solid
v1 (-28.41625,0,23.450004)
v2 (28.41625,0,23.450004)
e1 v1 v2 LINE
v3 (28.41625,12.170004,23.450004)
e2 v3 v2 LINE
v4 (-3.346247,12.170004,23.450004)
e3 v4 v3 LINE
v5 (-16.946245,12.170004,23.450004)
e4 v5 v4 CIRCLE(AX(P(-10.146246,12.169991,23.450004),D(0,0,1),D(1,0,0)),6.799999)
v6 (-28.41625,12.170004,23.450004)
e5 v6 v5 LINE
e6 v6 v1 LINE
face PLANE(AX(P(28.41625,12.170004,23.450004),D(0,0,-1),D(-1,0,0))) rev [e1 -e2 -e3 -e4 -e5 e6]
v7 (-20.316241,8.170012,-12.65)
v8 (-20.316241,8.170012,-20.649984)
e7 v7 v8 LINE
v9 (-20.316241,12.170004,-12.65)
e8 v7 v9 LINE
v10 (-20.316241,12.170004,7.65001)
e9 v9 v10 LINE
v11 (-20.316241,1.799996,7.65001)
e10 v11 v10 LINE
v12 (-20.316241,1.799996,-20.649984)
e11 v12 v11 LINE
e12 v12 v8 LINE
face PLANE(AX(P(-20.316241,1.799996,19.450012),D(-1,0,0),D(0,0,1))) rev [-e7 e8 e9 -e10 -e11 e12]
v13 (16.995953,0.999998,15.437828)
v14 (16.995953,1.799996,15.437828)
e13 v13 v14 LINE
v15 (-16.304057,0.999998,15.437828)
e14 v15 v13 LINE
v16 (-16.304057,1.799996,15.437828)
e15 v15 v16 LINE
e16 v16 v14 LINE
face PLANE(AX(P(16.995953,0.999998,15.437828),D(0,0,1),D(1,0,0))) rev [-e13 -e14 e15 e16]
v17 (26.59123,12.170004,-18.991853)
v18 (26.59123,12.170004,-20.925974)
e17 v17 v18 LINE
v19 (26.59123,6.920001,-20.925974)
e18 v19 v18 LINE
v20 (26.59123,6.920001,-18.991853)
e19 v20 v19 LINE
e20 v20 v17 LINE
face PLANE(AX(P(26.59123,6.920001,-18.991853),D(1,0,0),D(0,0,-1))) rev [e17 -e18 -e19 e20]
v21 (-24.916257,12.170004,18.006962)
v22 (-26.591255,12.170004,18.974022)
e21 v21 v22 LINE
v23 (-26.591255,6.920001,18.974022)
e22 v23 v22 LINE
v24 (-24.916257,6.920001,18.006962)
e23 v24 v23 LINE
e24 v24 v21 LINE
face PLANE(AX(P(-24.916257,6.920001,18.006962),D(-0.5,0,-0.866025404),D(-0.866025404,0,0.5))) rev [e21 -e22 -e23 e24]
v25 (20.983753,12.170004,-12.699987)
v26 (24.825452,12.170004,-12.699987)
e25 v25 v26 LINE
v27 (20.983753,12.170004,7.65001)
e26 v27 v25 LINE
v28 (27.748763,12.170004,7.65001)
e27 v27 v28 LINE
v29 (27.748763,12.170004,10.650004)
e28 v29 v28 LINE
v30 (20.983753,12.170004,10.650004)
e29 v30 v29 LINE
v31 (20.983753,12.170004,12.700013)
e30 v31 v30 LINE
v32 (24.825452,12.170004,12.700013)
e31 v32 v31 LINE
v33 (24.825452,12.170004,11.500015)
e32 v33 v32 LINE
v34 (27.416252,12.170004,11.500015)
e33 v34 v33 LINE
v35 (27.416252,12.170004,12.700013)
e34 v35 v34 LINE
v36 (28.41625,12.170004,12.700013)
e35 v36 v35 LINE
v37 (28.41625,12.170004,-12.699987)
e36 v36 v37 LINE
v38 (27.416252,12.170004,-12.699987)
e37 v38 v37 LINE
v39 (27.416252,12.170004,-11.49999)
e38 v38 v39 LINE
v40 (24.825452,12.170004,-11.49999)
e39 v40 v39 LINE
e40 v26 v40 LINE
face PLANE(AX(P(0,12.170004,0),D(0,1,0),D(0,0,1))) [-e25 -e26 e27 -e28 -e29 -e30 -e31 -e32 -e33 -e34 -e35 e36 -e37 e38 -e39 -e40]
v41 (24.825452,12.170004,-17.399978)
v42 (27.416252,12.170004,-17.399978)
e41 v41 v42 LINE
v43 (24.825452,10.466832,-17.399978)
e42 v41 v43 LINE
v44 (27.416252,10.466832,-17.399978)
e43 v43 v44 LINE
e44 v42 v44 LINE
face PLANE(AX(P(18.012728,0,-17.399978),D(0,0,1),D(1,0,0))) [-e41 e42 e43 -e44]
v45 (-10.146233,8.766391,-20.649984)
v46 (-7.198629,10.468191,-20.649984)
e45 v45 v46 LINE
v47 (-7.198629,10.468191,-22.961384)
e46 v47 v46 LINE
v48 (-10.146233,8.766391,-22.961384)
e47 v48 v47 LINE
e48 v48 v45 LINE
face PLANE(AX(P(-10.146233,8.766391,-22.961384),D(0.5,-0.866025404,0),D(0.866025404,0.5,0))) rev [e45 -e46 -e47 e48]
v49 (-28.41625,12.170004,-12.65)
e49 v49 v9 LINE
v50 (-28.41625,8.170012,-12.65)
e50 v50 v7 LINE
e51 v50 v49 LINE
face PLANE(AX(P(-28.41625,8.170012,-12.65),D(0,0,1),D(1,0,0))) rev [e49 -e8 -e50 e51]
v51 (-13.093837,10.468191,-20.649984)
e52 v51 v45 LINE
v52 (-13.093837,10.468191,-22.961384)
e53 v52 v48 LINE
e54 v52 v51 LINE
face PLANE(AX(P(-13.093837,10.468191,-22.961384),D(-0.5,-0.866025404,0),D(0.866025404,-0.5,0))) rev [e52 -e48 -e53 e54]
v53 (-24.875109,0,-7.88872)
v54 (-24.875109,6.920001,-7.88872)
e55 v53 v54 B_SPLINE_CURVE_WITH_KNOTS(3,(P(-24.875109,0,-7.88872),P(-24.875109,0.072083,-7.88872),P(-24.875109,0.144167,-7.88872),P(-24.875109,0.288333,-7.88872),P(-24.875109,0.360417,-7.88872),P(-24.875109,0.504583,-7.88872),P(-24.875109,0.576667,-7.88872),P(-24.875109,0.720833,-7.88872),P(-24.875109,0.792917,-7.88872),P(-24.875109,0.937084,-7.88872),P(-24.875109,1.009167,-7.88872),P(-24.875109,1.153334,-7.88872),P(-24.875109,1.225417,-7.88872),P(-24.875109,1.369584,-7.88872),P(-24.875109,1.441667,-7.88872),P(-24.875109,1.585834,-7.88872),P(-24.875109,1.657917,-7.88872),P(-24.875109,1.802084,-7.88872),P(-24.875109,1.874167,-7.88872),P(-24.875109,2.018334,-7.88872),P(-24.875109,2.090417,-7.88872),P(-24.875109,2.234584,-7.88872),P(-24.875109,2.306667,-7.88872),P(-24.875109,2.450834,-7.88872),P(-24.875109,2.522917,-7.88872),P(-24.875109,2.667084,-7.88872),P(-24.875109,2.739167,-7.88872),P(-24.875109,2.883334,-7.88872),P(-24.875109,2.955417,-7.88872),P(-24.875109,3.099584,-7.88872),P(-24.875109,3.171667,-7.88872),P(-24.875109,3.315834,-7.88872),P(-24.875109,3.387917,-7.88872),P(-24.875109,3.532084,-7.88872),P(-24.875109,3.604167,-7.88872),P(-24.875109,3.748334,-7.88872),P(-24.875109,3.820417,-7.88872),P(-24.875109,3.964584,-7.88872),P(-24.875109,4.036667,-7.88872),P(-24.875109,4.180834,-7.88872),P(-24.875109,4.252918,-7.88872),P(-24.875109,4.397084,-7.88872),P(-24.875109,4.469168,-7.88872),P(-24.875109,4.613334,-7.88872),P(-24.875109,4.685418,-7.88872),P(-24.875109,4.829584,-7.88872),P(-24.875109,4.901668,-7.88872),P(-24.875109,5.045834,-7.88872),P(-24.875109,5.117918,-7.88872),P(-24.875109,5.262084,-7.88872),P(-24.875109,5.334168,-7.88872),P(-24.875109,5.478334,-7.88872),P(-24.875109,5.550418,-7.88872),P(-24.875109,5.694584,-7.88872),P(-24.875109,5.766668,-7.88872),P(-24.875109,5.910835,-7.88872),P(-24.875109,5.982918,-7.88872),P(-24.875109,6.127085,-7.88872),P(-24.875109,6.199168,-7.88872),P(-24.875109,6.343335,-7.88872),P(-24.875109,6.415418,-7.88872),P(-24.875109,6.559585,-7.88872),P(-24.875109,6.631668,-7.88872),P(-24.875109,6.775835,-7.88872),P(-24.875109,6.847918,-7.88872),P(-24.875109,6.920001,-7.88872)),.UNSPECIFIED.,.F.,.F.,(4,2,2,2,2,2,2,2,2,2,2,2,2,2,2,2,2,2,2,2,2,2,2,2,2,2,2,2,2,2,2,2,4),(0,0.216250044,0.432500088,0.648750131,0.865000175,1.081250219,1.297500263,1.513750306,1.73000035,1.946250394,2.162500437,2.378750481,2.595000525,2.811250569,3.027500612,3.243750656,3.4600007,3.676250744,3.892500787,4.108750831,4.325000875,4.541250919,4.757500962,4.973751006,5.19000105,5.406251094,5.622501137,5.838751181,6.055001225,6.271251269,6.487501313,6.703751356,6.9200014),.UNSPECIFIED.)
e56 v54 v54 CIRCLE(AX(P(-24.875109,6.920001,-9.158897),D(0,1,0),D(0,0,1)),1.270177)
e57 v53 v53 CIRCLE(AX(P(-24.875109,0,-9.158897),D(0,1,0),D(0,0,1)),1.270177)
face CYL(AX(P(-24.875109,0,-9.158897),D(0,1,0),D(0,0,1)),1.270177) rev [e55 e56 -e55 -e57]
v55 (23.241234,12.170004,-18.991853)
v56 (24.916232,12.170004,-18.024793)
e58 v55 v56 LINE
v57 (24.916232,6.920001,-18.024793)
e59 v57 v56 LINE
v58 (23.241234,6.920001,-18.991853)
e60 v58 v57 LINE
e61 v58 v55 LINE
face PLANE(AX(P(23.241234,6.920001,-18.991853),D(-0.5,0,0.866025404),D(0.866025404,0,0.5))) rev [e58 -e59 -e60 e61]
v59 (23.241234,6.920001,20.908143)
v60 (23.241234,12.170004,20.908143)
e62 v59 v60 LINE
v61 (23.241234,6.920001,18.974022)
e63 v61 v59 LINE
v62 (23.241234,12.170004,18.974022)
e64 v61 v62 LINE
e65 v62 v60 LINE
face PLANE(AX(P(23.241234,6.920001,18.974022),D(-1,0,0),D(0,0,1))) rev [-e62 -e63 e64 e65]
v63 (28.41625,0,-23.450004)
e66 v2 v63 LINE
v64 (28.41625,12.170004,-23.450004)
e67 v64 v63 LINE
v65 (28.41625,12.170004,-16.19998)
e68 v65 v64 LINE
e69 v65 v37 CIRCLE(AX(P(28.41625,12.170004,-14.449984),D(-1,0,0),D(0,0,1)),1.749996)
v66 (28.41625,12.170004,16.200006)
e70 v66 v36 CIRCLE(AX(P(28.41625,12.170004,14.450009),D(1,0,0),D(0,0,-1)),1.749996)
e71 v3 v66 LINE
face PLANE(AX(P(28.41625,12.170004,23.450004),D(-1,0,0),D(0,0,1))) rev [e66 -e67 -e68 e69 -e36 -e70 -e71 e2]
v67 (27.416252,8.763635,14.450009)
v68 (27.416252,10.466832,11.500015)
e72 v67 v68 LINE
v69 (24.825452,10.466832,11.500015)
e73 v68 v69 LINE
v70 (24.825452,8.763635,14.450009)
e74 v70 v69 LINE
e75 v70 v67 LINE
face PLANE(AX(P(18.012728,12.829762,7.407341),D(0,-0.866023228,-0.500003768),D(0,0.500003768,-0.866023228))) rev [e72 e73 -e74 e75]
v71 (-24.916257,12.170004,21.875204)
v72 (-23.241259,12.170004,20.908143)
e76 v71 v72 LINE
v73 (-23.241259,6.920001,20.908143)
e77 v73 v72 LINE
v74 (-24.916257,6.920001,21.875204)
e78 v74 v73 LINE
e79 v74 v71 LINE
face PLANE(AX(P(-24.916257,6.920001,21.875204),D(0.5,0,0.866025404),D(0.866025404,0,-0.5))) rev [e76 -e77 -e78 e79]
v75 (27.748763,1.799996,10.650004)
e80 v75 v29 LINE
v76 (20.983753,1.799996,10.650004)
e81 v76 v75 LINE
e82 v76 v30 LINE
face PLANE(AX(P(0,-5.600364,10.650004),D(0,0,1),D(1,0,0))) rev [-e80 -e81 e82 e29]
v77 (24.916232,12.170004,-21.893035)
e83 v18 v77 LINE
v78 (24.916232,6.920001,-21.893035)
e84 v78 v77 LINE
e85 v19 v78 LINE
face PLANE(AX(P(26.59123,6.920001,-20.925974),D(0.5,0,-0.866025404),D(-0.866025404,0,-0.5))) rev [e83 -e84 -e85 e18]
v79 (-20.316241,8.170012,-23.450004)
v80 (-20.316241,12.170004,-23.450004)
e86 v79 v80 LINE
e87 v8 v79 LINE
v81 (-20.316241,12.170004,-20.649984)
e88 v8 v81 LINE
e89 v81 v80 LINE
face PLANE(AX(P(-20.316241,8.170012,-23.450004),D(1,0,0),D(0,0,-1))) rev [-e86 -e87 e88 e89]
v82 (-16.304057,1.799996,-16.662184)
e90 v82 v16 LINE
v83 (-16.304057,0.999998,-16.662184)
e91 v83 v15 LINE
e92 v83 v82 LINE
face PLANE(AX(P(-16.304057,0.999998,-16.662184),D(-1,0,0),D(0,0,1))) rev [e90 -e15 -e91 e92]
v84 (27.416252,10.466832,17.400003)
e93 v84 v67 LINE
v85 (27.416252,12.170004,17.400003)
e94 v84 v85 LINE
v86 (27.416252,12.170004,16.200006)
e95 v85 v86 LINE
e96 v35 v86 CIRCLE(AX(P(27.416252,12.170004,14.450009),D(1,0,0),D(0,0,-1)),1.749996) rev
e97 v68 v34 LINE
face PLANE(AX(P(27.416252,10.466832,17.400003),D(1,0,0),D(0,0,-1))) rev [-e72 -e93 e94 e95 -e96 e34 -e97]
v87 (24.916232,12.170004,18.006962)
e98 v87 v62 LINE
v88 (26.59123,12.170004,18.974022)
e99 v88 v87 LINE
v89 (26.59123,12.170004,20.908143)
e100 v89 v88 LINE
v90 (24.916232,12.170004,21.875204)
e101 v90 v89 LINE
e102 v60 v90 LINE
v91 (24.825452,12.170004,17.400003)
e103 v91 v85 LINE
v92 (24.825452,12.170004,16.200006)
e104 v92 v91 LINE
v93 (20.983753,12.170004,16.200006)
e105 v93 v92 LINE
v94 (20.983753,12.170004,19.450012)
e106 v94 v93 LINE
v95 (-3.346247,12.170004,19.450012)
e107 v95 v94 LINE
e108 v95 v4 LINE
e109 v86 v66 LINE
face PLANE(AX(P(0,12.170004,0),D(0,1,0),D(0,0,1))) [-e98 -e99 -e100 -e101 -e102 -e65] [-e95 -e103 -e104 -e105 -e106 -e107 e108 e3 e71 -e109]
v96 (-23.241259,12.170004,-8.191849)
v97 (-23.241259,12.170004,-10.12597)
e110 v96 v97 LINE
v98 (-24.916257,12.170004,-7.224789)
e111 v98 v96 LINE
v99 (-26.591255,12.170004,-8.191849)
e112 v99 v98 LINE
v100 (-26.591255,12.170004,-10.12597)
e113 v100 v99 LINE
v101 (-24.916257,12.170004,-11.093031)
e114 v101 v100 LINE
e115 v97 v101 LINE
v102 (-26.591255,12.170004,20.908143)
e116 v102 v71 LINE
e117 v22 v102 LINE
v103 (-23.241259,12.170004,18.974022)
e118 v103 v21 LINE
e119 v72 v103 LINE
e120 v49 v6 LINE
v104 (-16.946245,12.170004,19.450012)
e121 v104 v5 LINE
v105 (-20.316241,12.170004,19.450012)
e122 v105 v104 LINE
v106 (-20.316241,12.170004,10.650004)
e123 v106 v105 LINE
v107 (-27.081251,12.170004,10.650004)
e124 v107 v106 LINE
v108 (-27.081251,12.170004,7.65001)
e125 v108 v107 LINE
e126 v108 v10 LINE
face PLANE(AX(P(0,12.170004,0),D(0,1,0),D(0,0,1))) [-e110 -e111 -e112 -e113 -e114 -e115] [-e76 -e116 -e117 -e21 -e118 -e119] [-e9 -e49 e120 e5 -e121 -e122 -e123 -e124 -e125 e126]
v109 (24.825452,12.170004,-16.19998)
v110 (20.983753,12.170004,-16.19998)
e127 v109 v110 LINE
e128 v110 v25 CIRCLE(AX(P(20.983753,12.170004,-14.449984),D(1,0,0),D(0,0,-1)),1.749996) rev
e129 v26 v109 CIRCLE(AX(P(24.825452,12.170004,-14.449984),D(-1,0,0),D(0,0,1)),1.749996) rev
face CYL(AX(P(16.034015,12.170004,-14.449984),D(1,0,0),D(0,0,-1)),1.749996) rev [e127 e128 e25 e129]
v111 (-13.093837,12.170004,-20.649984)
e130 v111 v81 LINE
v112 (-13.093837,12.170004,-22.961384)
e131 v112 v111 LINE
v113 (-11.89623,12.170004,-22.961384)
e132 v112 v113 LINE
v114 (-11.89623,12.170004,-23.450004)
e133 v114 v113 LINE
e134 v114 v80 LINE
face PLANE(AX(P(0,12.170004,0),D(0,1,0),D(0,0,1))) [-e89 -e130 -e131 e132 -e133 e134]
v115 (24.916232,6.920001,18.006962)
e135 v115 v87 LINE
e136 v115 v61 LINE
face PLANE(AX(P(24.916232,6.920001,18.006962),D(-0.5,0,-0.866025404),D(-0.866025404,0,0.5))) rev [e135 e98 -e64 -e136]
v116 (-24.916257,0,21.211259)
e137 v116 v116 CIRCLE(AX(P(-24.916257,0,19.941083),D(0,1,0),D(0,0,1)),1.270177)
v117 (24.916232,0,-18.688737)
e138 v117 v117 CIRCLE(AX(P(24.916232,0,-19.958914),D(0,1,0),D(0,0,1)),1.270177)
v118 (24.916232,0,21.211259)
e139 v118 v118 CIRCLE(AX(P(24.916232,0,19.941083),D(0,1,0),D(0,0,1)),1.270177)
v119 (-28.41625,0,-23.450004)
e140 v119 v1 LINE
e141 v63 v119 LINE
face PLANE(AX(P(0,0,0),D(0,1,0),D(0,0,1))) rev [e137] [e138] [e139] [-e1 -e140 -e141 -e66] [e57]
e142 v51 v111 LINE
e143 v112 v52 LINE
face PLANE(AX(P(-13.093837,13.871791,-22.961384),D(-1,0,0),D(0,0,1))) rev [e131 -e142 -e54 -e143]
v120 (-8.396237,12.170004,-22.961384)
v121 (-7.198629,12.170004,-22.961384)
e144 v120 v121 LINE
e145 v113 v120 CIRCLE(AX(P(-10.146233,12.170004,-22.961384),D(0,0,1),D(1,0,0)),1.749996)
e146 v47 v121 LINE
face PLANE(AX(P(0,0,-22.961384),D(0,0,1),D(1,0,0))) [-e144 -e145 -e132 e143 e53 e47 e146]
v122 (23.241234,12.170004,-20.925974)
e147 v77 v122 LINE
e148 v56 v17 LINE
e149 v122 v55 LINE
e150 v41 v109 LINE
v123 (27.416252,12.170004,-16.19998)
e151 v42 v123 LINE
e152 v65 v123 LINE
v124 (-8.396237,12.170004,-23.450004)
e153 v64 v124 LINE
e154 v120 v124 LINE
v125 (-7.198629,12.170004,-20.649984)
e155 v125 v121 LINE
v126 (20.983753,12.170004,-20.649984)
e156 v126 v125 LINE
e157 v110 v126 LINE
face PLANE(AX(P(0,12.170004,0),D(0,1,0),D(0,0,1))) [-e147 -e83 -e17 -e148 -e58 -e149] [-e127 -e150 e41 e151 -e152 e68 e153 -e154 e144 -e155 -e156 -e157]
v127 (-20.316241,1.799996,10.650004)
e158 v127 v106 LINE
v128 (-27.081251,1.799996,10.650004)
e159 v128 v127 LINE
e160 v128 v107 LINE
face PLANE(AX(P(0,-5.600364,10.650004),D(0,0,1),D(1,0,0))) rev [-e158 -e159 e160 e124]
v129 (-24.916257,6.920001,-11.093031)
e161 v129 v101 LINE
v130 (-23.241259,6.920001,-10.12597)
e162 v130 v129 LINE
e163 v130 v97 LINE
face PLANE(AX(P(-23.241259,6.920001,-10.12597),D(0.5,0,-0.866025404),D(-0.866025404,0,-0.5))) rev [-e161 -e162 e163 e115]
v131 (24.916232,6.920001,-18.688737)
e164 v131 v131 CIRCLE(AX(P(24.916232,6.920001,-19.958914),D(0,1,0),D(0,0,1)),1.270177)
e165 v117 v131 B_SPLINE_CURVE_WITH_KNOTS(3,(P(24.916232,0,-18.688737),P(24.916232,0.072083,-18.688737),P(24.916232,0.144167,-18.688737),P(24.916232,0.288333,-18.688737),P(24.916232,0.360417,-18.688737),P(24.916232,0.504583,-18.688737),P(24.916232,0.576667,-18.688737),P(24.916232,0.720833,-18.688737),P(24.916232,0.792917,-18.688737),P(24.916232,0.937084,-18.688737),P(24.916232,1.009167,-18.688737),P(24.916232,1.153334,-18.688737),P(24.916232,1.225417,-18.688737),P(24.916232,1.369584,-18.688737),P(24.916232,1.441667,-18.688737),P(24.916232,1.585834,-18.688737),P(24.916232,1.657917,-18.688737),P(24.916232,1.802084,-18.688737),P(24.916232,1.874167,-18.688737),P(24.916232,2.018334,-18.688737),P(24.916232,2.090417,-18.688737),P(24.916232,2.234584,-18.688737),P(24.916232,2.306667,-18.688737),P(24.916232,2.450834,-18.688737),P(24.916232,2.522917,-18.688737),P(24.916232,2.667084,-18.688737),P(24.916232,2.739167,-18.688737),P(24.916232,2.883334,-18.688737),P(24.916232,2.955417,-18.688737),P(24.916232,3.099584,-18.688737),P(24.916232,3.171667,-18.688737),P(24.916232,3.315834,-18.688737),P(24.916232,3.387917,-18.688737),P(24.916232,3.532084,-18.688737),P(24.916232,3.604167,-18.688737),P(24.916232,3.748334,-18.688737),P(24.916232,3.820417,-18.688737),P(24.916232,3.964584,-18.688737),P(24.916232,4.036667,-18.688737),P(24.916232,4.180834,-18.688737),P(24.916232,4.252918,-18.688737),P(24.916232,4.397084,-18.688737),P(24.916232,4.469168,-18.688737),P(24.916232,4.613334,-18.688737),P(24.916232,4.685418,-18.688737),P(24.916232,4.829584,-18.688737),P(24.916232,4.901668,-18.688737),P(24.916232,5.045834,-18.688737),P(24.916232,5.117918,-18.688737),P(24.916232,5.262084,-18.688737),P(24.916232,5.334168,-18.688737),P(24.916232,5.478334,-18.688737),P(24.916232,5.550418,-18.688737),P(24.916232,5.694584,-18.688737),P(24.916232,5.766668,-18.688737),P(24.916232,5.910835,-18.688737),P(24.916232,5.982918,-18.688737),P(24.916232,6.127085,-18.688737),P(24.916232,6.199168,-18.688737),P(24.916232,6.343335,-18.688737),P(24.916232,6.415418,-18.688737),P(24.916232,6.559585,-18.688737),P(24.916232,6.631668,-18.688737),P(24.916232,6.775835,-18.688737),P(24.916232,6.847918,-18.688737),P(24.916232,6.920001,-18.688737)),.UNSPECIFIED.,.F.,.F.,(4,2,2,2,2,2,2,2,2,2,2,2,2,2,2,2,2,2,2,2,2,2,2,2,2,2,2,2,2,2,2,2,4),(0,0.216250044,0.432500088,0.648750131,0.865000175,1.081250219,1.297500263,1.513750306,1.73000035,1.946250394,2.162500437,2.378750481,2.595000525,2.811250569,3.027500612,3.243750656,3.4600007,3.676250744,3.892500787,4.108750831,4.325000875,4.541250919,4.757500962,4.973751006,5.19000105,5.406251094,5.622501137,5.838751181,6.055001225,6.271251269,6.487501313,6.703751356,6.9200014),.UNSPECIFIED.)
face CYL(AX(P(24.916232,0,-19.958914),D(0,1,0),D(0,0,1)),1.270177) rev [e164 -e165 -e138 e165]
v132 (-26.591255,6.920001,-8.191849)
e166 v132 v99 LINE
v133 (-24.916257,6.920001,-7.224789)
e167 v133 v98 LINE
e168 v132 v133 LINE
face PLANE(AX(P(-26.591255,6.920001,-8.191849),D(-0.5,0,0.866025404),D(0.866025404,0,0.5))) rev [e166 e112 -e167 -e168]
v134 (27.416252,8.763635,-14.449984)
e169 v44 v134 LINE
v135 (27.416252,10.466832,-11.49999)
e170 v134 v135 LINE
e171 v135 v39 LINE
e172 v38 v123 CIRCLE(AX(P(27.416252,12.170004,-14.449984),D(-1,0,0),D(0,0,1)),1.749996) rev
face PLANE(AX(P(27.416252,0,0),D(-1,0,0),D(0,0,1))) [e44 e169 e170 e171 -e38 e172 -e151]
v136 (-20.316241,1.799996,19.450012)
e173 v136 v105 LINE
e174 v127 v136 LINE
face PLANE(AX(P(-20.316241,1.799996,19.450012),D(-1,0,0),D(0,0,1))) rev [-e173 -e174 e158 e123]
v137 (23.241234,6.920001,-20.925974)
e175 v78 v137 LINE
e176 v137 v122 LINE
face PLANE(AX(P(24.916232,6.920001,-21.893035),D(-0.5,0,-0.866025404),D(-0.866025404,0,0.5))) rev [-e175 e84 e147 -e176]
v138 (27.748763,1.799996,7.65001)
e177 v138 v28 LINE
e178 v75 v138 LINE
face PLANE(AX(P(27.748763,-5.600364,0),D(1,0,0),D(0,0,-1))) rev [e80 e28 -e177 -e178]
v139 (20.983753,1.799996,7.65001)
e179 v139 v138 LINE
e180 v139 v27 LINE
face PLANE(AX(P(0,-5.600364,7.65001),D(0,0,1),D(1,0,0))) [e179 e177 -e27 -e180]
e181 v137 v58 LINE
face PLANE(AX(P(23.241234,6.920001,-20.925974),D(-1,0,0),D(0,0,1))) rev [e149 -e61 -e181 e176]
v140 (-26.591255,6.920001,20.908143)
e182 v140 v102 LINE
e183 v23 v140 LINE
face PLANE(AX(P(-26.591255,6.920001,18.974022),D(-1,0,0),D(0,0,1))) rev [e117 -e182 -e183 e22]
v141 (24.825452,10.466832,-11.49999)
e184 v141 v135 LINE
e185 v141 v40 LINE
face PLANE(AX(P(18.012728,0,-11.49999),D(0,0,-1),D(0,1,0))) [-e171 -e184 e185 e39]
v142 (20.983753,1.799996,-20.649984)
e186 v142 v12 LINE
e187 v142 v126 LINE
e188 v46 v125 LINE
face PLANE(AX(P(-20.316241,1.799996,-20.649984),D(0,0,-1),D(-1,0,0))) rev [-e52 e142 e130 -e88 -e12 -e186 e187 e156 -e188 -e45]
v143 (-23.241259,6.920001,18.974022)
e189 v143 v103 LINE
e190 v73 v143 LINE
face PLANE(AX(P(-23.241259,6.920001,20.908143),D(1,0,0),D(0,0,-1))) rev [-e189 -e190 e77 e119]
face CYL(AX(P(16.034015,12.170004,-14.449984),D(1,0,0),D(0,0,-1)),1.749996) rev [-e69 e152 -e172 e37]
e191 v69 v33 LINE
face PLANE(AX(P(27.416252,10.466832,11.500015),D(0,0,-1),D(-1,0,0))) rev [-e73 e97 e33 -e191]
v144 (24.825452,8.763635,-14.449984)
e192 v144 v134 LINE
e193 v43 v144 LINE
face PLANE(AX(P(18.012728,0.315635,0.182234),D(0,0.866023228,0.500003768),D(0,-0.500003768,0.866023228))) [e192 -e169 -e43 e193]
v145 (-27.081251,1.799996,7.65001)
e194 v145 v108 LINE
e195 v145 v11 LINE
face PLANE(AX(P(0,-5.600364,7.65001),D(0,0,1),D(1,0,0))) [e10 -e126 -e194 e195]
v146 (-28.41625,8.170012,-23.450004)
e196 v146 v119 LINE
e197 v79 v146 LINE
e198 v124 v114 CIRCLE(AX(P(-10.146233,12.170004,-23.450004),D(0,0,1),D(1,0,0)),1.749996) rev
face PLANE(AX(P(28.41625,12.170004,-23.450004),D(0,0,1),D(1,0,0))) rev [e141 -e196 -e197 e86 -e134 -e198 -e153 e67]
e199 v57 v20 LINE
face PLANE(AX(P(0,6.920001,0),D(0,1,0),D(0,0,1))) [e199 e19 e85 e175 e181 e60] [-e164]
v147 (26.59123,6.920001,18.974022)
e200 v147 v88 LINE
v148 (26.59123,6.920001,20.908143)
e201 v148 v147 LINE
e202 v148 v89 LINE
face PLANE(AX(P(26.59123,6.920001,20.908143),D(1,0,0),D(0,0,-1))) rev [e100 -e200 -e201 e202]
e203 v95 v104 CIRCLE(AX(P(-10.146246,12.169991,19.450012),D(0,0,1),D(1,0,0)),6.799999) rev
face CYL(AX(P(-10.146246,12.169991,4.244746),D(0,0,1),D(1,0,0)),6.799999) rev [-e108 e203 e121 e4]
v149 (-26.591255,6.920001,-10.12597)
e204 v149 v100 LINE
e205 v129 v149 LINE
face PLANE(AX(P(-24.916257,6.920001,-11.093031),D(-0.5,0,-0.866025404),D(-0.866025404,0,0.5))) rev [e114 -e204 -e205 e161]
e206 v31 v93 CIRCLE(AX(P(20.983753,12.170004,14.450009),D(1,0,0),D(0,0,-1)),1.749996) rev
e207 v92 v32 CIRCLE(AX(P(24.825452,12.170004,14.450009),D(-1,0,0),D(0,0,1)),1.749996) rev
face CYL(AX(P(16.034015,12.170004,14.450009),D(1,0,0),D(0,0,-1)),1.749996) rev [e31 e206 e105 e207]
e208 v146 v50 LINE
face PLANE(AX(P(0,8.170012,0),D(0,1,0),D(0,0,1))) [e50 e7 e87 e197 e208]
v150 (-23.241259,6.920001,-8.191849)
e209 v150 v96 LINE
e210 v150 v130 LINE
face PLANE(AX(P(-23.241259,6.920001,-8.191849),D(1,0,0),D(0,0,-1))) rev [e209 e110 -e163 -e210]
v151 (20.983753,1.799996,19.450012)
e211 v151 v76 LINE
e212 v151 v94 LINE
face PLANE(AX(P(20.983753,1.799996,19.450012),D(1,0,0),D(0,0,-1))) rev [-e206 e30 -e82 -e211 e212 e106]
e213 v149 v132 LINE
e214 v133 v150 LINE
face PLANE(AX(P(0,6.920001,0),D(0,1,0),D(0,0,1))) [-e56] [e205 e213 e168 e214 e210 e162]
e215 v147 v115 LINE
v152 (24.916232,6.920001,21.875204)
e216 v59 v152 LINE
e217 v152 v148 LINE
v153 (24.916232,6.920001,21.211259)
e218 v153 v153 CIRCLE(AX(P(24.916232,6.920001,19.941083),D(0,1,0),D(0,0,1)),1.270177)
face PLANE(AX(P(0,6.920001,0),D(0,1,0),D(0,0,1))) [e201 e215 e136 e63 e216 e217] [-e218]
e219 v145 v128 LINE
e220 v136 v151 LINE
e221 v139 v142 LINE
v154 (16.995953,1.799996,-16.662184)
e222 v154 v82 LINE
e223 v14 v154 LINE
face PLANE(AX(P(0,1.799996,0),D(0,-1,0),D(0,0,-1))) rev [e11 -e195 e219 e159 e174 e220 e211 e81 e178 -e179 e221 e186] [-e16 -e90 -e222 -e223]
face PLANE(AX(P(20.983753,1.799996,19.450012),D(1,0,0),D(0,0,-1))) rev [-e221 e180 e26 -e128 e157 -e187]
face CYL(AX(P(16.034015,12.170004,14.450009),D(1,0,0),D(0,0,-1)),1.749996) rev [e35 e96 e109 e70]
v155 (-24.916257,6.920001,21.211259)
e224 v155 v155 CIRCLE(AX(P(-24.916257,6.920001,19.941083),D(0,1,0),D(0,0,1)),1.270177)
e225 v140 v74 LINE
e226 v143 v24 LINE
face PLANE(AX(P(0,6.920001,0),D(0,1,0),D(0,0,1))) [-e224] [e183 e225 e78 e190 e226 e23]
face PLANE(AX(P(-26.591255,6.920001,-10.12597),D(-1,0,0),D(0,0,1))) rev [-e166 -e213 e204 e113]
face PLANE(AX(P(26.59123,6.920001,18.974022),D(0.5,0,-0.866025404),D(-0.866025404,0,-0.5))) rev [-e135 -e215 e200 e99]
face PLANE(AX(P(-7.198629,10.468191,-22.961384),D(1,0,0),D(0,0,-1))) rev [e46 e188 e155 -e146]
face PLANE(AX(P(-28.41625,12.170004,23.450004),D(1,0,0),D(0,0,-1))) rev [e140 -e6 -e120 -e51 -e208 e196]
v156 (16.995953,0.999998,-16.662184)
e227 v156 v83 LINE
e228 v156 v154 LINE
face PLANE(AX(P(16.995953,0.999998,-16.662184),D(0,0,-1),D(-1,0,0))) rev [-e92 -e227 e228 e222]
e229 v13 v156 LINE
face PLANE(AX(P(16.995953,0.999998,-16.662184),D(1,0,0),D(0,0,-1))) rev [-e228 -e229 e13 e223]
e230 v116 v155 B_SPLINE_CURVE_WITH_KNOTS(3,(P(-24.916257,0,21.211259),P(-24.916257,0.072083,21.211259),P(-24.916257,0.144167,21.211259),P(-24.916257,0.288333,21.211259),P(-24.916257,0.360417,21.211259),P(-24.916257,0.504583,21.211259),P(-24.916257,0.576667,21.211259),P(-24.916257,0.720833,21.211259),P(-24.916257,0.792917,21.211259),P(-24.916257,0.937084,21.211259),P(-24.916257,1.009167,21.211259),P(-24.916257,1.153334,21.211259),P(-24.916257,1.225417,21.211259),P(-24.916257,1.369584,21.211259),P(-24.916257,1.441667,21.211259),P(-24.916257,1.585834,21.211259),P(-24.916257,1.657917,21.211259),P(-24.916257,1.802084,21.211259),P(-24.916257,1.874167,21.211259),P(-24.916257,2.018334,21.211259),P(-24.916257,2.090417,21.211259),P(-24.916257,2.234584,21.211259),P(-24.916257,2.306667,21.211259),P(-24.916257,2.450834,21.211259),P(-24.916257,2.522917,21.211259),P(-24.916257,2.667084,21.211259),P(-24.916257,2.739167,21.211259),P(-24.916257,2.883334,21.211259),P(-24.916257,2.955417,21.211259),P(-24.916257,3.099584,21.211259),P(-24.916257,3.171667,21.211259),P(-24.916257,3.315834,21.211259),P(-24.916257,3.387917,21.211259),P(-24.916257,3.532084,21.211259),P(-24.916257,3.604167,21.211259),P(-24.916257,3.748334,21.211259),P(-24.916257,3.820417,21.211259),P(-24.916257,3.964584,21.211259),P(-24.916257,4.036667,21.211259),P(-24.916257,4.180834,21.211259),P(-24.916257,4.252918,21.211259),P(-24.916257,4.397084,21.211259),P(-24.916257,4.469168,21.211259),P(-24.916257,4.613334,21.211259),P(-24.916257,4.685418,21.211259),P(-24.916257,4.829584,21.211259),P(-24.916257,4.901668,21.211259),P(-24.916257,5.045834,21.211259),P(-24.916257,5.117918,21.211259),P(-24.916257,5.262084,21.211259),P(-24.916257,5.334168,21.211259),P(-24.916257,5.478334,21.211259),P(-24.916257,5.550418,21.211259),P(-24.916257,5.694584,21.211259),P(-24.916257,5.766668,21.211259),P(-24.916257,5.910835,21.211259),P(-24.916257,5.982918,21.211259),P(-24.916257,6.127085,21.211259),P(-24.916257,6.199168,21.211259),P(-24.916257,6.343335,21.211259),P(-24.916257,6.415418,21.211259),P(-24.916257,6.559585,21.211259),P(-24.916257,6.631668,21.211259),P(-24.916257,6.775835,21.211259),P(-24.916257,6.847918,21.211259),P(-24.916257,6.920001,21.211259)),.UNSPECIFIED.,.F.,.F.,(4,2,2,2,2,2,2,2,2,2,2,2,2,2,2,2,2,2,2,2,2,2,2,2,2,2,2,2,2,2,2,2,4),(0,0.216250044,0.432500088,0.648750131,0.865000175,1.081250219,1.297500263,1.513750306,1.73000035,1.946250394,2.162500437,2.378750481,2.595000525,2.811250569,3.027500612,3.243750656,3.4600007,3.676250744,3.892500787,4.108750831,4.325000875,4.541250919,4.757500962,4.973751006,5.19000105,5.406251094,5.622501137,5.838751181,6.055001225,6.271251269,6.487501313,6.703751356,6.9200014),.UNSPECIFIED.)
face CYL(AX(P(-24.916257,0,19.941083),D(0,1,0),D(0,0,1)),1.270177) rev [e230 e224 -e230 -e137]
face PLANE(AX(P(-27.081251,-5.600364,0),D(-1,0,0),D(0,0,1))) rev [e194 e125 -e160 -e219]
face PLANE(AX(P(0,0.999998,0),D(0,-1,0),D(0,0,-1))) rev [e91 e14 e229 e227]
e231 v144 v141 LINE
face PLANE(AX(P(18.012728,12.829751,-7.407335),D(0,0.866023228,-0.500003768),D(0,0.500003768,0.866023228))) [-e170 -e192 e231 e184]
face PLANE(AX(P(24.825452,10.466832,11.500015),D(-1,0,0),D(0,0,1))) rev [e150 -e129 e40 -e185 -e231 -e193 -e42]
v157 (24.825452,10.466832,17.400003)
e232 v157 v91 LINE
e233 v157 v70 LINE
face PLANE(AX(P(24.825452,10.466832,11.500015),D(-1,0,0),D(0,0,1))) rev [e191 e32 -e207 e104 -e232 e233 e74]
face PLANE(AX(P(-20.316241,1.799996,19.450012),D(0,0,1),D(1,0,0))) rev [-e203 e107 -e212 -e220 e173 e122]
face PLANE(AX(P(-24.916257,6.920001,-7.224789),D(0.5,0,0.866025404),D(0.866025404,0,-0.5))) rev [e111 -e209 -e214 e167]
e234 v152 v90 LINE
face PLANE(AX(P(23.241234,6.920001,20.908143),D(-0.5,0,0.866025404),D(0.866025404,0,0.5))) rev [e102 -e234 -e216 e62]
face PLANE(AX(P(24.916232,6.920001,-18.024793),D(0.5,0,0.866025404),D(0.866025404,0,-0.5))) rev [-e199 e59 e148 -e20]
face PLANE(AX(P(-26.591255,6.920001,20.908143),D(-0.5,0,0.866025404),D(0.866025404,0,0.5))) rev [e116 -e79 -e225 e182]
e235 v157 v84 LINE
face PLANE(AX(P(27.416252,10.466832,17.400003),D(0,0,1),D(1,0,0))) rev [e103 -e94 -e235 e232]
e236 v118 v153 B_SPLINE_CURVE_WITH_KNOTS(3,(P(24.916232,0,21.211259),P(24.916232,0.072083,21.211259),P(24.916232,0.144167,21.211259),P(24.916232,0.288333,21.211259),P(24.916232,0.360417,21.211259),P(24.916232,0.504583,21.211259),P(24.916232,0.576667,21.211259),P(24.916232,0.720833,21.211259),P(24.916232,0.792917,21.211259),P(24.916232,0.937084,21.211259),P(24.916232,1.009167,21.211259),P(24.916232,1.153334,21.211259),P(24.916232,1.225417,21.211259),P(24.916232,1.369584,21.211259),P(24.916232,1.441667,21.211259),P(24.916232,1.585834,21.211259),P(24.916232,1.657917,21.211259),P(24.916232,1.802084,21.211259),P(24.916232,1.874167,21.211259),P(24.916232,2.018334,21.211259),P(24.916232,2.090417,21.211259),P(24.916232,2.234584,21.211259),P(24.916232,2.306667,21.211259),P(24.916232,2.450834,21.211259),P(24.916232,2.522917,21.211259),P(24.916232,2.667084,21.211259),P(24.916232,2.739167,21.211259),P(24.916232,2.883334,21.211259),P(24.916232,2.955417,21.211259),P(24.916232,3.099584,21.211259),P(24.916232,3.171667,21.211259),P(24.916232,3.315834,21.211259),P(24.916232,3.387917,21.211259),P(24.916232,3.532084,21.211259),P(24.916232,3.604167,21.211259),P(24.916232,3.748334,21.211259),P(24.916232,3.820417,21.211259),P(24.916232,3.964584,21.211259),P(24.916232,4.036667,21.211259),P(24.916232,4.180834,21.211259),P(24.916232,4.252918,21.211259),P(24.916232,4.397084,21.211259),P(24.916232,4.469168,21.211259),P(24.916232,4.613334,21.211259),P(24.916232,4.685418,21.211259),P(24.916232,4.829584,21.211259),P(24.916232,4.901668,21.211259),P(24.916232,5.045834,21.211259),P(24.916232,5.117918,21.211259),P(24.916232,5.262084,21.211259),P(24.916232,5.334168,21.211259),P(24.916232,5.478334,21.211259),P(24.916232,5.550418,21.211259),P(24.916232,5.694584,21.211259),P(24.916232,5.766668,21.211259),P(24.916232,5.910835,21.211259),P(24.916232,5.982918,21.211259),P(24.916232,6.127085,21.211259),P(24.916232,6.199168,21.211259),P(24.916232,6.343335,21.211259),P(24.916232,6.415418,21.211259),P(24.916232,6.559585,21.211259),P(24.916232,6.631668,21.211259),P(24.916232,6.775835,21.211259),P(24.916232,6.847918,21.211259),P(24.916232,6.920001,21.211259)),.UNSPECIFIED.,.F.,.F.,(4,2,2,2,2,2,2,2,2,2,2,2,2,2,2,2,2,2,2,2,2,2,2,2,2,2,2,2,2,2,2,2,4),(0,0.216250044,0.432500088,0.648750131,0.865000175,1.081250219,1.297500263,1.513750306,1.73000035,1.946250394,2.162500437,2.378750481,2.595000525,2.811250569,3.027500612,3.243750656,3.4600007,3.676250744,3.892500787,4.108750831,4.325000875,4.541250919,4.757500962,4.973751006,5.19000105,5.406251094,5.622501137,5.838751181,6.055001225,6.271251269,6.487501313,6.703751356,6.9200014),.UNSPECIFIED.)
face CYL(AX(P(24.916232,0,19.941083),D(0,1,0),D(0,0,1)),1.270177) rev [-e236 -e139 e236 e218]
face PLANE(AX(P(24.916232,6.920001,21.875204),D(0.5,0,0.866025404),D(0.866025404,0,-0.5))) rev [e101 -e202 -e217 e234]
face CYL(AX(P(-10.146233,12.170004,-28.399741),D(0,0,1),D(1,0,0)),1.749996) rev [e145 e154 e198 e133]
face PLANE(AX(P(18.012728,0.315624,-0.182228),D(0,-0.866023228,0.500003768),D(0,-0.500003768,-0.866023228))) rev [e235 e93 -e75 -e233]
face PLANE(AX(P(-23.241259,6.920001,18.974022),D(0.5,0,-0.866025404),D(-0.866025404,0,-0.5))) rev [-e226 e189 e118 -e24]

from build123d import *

# Parameters (mm, degrees)
SKETCH1_W              = 56.8325
SKETCH1_H              = 46.9000078
BOSS_EXTRUDE1_DEPTH    = 12.1700036
SKETCH2_W              = 41.2999936
SKETCH2_H              = 40.099996
CUT_EXTRUDE1_DEPTH     = 10.3700072
SKETCH3_W              = 33.3000096
SKETCH3_H              = 32.100012
CUT_EXTRUDE2_DEPTH     = 0.7999984
SKETCH4_W              = 8.1000092
SKETCH4_H              = 10.8000038
CUT_EXTRUDE3_DEPTH     = 3.999992
CUT_EXTRUDE4_START     = -10.3700072
CUT_EXTRUDE4_OUTLINE_W = 6.7650106
CUT_EXTRUDE4_OUTLINE_H = 2.999994
CUT_EXTRUDE4_DEPTH     = 10.3700072
SKETCH6_W              = 6.7650106
SKETCH6_H              = 2.999994
CUT_EXTRUDE5_DEPTH     = 10.3700072
CUT_EXTRUDE6_DEPTH     = 3.999992
CUT_EXTRUDE7_DEPTH     = 5.2500022
SKETCH9_R              = 1.270176684
SKETCH9_R_2            = 1.270176657
CUT_EXTRUDE8_DEPTH     = 38.486962618
CUT_EXTRUDE10_DEPTH    = 2.3114
CUT_EXTRUDE11_DEPTH    = 0.4886198
CUT_EXTRUDE12_DEPTH    = 7.4324972
SKETCH14_W             = 2.5908
SKETCH14_H             = 5.8999882
CUT_EXTRUDE13_DEPTH    = 1.7031716
CUT_EXTRUDE15_DEPTH    = 2.5908


# Read off the part's stored shape, not the designer's step: Cut-Extrude4
with BuildPart() as part:
    # Sketch1 → Boss-Extrude1 (new body)
    with BuildSketch(Plane(origin=(0, 0, 0), x_dir=(1, 0, 0), z_dir=(0, 1, 0))):
        Rectangle(SKETCH1_W, SKETCH1_H)
    extrude(amount=BOSS_EXTRUDE1_DEPTH)

    # Sketch2 → Cut-Extrude1 (cut)
    with BuildSketch(Plane(origin=(0, 12.1700036, 0), x_dir=(1, 0, 0), z_dir=(0, 1, 0))):
        with Locations((0.333756, 0.5999861)):
            Rectangle(SKETCH2_W, SKETCH2_H)
    extrude(amount=-CUT_EXTRUDE1_DEPTH, mode=Mode.SUBTRACT)

    # Sketch3 → Cut-Extrude2 (cut)
    with BuildSketch(Plane(origin=(0, 1.7999964, 0), x_dir=(1, 0, 0), z_dir=(0, 1, 0))):
        with Locations((0.345948, 0.6121781)):
            Rectangle(SKETCH3_W, SKETCH3_H)
    extrude(amount=-CUT_EXTRUDE2_DEPTH, mode=Mode.SUBTRACT)

    # Sketch4 → Cut-Extrude3 (cut)
    with BuildSketch(Plane(origin=(0, 12.1700036, 0), x_dir=(1, 0, 0), z_dir=(0, 1, 0))):
        with Locations((-24.3662454, 18.050002)):
            Rectangle(SKETCH4_W, SKETCH4_H)
    extrude(amount=-CUT_EXTRUDE3_DEPTH, mode=Mode.SUBTRACT)

    # Cut-Extrude4 outline → Cut-Extrude4 (cut)
    with BuildSketch(Plane(origin=(0, 12.1700036, 0), x_dir=(1, 0, 0), z_dir=(0, 1, 0)).offset(CUT_EXTRUDE4_START)):
        with Locations((-23.6987461, -9.1500071)):
            Rectangle(CUT_EXTRUDE4_OUTLINE_W, CUT_EXTRUDE4_OUTLINE_H)
    extrude(amount=CUT_EXTRUDE4_DEPTH, mode=Mode.SUBTRACT)

    # Sketch6 → Cut-Extrude5 (cut)
    with BuildSketch(Plane(origin=(0, 12.1700036, 0), x_dir=(1, 0, 0), z_dir=(0, 1, 0))):
        with Locations((24.3662581, -9.1500071)):
            Rectangle(SKETCH6_W, SKETCH6_H)
    extrude(amount=-CUT_EXTRUDE5_DEPTH, mode=Mode.SUBTRACT)

    # Sketch7 → Cut-Extrude6 (cut)
    with BuildSketch(Plane.XY.offset(23.4500039)):
        with BuildLine():
            Line((-3.3462468, 12.1700036), (-16.946245, 12.1700036))
            ThreePointArc((-16.946245, 12.1700036), (-10.1462459, 5.3699918), (-3.3462468, 12.1700036))
        make_face()
    extrude(amount=-CUT_EXTRUDE6_DEPTH, mode=Mode.SUBTRACT)

    # Sketch8 → Cut-Extrude7 (cut)
    with BuildSketch(Plane(origin=(0, 12.1700036, 0), x_dir=(1, 0, 0), z_dir=(0, 1, 0))):
        Polygon((-24.916257, -18.0069617), (-26.591255007, -18.97402225), (-26.591255007, -20.90814335), (-24.916257, -21.8752039), (-23.241258993, -20.90814335), (-23.241258993, -18.97402225), align=None)
        Polygon((-24.916257, 11.0930309), (-26.591255007, 10.12597035), (-26.591255007, 8.19184925), (-24.916257, 7.2247887), (-23.241258993, 8.19184925), (-23.241258993, 10.12597035), align=None)
        Polygon((24.9162316, 21.8930347), (23.241233593, 20.92597415), (23.241233593, 18.99185305), (24.9162316, 18.0247925), (26.591229607, 18.99185305), (26.591229607, 20.92597415), align=None)
        Polygon((24.9162316, -18.0069617), (23.241233593, -18.97402225), (23.241233593, -20.90814335), (24.9162316, -21.8752039), (26.591229607, -20.90814335), (26.591229607, -18.97402225), align=None)
    extrude(amount=-CUT_EXTRUDE7_DEPTH, mode=Mode.SUBTRACT)

    # Sketch9 → Cut-Extrude8 (cut, through all)
    with BuildSketch(Plane(origin=(0, 6.9200014, 0), x_dir=(1, 0, 0), z_dir=(0, 1, 0))):
        with Locations(Location((-24.875109, 9.1588971, 0), (0, 0, 270))):
            Circle(SKETCH9_R)
        with Locations(Location((-24.916257, -19.9410828, 0), (0, 0, 270))):
            Circle(SKETCH9_R_2)
        with Locations(Location((24.9162316, -19.9410828, 0), (0, 0, 270))):
            Circle(SKETCH9_R_2)
        with Locations(Location((24.9162316, 19.9589136, 0), (0, 0, 270))):
            Circle(SKETCH9_R_2)
    extrude(amount=-CUT_EXTRUDE8_DEPTH, mode=Mode.SUBTRACT)

    # Sketch11 → Cut-Extrude10 (cut)
    with BuildSketch(Plane.XY.offset(-20.6499841)):
        Polygon((-13.093837264, 10.4681909), (-10.1462332, 8.7663909), (-7.198629136, 10.4681909), (-7.198629136, 13.8717909), (-10.1462332, 15.5735909), (-13.093837264, 13.8717909), align=None)
    extrude(amount=-CUT_EXTRUDE10_DEPTH, mode=Mode.SUBTRACT)

    # Sketch12 → Cut-Extrude11 (cut)
    with BuildSketch(Plane.XY.offset(-22.9613841)):
        with BuildLine():
            ThreePointArc((-8.3962367, 12.1700036), (-10.1462332, 13.9200001), (-11.8962297, 12.1700036))
            Line((-11.8962297, 12.1700036), (-8.3962367, 12.1700036))
        make_face()
        with BuildLine():
            Line((-8.3962367, 12.1700036), (-11.8962297, 12.1700036))
            ThreePointArc((-11.8962297, 12.1700036), (-10.1462332, 10.4200071), (-8.3962367, 12.1700036))
        make_face()
    extrude(amount=-CUT_EXTRUDE11_DEPTH, mode=Mode.SUBTRACT)

    # Sketch13 → Cut-Extrude12 (cut)
    with BuildSketch(Plane(origin=(28.41625, 0, 0), x_dir=(0, 0, -1), z_dir=(1, 0, 0))):
        with BuildLine():
            ThreePointArc((16.1999803, 12.1700036), (14.4499838, 13.9200001), (12.6999873, 12.1700036))
            Line((12.6999873, 12.1700036), (16.1999803, 12.1700036))
        make_face()
        with BuildLine():
            Line((16.1999803, 12.1700036), (12.6999873, 12.1700036))
            ThreePointArc((12.6999873, 12.1700036), (14.4499838, 10.4200071), (16.1999803, 12.1700036))
        make_face()
        with BuildLine():
            Line((-16.2000057, 12.1700036), (-12.7000127, 12.1700036))
            ThreePointArc((-12.7000127, 12.1700036), (-14.4500092, 13.9200001), (-16.2000057, 12.1700036))
        make_face()
        with BuildLine():
            ThreePointArc((-16.2000057, 12.1700036), (-14.4500092, 10.4200071), (-12.7000127, 12.1700036))
            Line((-12.7000127, 12.1700036), (-16.2000057, 12.1700036))
        make_face()
    extrude(amount=-CUT_EXTRUDE12_DEPTH, mode=Mode.SUBTRACT)

    # Sketch14 → Cut-Extrude13 (cut)
    with BuildSketch(Plane(origin=(0, 12.1700036, 0), x_dir=(1, 0, 0), z_dir=(0, 1, 0))):
        with Locations((26.120852, -14.4500092)):
            Rectangle(SKETCH14_W, SKETCH14_H)
    extrude(amount=-CUT_EXTRUDE13_DEPTH, mode=Mode.SUBTRACT)

    # Sketch16 → Cut-Extrude15 (cut)
    with BuildSketch(Plane.ZY.offset(-27.416252)):
        with BuildLine():
            Line((14.4500092, 8.763635), (17.4000033, 10.466832))
            Line((17.4000033, 10.466832), (14.852121437, 10.466832))
            ThreePointArc((14.852121437, 10.466832), (15.822266967, 11.084003429), (16.2000057, 12.1700036))
            Line((16.2000057, 12.1700036), (11.5000151, 12.1700036))
            Line((11.5000151, 12.1700036), (11.5000151, 10.466832))
            Line((11.5000151, 10.466832), (14.4500092, 8.763635))
        make_face()
        Polygon((-17.3999779, 12.1700036), (-17.3999779, 10.466832), (-14.4499838, 8.763635), (-11.4999897, 10.466832), (-11.4999897, 12.1700036), align=None)
    extrude(amount=CUT_EXTRUDE15_DEPTH, mode=Mode.SUBTRACT)


solid = part.part
